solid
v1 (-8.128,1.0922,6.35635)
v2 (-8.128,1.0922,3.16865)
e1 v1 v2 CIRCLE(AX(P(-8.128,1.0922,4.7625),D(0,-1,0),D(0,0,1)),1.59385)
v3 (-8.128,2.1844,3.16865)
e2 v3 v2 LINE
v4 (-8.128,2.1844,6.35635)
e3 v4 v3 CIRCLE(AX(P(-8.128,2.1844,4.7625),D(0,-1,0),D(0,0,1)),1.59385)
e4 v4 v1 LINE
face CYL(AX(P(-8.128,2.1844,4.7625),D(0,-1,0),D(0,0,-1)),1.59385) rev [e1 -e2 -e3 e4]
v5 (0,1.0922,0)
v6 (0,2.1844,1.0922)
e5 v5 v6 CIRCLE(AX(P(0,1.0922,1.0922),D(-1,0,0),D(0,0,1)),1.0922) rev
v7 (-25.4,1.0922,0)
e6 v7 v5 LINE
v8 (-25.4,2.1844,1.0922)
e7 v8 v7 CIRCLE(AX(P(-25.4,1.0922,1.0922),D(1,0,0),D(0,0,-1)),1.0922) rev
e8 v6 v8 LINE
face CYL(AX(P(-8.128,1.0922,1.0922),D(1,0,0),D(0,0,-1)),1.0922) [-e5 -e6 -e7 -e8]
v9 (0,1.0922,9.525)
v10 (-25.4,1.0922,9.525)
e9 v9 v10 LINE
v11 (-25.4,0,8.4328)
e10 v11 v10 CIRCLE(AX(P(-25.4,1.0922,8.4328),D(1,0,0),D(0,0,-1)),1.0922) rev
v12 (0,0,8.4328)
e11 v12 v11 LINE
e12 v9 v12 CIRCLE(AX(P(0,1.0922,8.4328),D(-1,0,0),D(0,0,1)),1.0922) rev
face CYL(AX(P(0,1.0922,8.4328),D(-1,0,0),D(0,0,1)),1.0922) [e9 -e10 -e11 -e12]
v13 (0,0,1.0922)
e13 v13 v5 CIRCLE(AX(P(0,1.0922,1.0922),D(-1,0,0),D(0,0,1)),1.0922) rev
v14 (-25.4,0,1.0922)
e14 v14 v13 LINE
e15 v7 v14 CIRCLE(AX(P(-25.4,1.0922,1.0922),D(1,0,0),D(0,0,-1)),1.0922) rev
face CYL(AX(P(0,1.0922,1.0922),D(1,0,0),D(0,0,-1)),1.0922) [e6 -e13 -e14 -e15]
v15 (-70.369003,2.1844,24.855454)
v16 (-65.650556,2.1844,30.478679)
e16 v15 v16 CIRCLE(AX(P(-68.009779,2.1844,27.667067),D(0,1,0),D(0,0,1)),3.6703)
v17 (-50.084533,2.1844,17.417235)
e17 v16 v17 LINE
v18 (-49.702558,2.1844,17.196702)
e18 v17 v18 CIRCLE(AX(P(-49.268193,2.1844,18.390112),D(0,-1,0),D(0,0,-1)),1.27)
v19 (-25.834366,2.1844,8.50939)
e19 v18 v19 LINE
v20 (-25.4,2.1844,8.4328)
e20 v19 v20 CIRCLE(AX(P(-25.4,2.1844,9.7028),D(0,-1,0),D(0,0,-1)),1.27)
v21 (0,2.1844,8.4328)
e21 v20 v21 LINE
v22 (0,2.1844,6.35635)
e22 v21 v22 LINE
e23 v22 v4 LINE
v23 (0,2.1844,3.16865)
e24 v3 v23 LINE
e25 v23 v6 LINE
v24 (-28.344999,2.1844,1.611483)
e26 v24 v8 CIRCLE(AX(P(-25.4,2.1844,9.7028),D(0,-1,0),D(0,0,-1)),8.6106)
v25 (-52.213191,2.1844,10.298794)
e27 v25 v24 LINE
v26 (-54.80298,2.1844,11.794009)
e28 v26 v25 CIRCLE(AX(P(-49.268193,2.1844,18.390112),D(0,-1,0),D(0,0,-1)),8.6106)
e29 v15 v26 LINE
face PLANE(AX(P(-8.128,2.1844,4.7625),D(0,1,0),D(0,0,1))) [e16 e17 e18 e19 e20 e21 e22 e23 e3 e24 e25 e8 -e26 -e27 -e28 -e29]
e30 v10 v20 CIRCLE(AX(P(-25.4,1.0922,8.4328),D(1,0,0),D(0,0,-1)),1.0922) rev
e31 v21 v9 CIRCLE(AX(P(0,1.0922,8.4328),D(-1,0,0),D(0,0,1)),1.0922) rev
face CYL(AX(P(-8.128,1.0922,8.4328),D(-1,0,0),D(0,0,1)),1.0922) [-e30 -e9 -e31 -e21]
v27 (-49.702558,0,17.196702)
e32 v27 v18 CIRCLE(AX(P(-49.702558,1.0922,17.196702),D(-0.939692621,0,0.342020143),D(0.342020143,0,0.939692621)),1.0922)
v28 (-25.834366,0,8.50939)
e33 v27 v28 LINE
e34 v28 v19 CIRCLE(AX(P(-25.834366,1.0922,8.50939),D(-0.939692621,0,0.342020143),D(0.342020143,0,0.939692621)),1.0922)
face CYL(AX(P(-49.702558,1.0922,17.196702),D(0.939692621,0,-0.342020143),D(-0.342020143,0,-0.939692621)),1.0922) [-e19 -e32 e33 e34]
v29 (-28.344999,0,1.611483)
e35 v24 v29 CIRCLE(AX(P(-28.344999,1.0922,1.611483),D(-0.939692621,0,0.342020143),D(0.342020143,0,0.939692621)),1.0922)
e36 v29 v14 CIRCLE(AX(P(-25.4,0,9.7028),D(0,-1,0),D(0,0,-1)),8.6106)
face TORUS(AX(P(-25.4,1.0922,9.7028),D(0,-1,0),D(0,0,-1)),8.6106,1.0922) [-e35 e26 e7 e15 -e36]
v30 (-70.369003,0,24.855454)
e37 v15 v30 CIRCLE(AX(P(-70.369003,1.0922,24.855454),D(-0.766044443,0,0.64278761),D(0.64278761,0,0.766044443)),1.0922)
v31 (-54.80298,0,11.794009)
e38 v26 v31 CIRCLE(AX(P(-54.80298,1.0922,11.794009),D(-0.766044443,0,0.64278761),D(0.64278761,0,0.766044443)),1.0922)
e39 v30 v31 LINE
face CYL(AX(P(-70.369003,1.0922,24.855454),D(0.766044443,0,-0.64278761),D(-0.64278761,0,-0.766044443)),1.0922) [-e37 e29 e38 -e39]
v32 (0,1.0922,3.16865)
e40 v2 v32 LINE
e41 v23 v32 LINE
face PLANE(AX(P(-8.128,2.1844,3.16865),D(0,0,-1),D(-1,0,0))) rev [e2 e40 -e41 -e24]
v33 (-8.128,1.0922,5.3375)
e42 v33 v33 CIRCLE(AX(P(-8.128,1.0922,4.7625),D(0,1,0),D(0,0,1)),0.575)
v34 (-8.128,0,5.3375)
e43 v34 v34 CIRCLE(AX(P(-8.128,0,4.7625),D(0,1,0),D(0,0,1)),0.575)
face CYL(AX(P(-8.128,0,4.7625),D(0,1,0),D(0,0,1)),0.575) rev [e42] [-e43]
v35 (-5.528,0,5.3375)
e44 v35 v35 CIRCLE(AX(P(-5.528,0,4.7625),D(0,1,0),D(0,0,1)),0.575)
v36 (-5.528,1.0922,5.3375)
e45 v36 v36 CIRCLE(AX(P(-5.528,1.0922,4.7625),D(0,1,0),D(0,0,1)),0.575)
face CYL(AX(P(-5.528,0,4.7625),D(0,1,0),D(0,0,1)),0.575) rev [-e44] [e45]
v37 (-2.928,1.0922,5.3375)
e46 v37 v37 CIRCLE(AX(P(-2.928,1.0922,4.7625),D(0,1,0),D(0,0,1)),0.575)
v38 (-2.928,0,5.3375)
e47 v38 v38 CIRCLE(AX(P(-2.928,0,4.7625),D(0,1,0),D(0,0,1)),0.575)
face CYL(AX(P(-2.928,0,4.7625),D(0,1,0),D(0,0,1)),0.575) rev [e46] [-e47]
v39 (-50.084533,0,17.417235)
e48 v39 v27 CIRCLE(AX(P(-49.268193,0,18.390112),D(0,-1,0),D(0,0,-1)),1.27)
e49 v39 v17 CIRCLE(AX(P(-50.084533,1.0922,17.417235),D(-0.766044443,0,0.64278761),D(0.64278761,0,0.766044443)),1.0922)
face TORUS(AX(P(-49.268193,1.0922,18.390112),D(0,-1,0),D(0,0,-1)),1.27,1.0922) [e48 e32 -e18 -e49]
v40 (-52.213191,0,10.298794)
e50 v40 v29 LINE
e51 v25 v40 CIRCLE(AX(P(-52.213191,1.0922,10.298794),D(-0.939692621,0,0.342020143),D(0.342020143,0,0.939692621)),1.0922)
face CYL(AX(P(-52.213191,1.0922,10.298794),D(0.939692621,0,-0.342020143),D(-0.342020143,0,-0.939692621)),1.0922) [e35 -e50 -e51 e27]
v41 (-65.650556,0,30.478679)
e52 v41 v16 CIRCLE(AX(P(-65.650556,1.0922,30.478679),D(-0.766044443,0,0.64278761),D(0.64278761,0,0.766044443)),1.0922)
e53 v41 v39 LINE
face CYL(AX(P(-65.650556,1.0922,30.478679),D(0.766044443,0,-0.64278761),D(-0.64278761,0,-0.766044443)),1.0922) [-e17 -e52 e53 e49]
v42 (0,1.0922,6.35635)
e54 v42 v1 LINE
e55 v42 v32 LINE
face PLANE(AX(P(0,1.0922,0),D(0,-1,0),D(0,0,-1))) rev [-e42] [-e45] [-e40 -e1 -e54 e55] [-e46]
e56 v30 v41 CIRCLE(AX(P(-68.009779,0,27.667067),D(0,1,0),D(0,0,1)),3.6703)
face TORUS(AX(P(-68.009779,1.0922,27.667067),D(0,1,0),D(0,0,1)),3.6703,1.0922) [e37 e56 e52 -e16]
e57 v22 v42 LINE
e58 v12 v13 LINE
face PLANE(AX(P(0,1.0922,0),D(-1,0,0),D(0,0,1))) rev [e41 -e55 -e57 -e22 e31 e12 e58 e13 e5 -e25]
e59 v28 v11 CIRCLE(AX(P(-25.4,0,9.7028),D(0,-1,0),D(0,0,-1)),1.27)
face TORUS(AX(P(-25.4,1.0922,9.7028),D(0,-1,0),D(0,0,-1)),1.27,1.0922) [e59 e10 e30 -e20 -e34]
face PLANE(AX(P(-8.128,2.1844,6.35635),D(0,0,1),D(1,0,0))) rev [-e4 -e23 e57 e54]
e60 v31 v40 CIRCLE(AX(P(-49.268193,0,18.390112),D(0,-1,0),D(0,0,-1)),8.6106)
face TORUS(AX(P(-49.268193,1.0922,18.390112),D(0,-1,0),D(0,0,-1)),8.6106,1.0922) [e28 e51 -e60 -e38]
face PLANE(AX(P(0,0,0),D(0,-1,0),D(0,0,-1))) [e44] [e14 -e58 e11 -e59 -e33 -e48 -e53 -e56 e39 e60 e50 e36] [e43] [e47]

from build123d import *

# Parameters (mm, degrees)
SKETCH1_W           = 25.4
SKETCH1_H           = 9.525
BOSS_EXTRUDE1_DEPTH = 1.0922
BOSS_EXTRUDE2_DEPTH = 1.0922
FILLET1_R           = 1.0922
SKETCH3_R           = 0.575
CUT_EXTRUDE1_DEPTH  = 28.149190151
REVOLVE1_ANGLE      = 20
BOSS_EXTRUDE3_DEPTH = 25.4
REVOLVE2_ANGLE      = 20
BOSS_EXTRUDE4_DEPTH = 20.32
REVOLVE3_ANGLE      = 180


with BuildPart() as part:
    # Sketch1 → Boss-Extrude1 (new body)
    with BuildSketch(Plane(origin=(0, 0, 0), x_dir=(1, 0, 0), z_dir=(0, 1, 0))):
        with Locations((-12.7, -4.7625)):
            Rectangle(SKETCH1_W, SKETCH1_H)
    extrude(amount=BOSS_EXTRUDE1_DEPTH)

    # Sketch2 → Boss-Extrude2 (add)
    with BuildSketch(Plane(origin=(0, 1.0922, 0), x_dir=(1, 0, 0), z_dir=(0, 1, 0))):
        with BuildLine():
            Line((-8.128, -3.16865), (0, -3.16865))
            Line((0, -3.16865), (0, 0))
            Line((0, 0), (-25.4, 0))
            Line((-25.4, 0), (-25.4, -9.525))
            Line((-25.4, -9.525), (0, -9.525))
            Line((0, -9.525), (0, -6.35635))
            Line((0, -6.35635), (-8.128, -6.35635))
            ThreePointArc((-8.128, -6.35635), (-9.72185, -4.7625), (-8.128, -3.16865))
        make_face()
    extrude(amount=BOSS_EXTRUDE2_DEPTH)

    # Fillet1
    fillet1_edges = [part.edges().sort_by_distance(p)[0] for p in [
        (-12.7, 0, 0),
        (-12.7, 2.1844, 0),
        (-12.7, 0, 9.525),
        (-12.7, 2.1844, 9.525),
    ]]
    fillet(fillet1_edges, radius=FILLET1_R - 0.0001)  # a hair under: the kernel refuses the full size

    # Sketch3 → Cut-Extrude1 (cut, through all)
    with BuildSketch(Plane(origin=(0, 1.0922, 0), x_dir=(1, 0, 0), z_dir=(0, 1, 0))):
        with Locations(Location((-8.128, -4.7625, 0), (0, 0, 270))):
            Circle(SKETCH3_R)
        with Locations(Location((-5.528, -4.7625, 0), (0, 0, 270))):
            Circle(SKETCH3_R)
        with Locations(Location((-2.928, -4.7625, 0), (0, 0, 270))):
            Circle(SKETCH3_R)
    extrude(amount=-CUT_EXTRUDE1_DEPTH, mode=Mode.SUBTRACT)

    # Sketch5 → Revolve1 (revolve)
    with BuildSketch(Plane.ZY.offset(25.4)):
        with BuildLine():
            Line((1.0922, 0), (8.4328, 0))
            ThreePointArc((8.4328, 0), (9.205102026, 0.319897974), (9.525, 1.0922))
            ThreePointArc((9.525, 1.0922), (9.205102026, 1.864502026), (8.4328, 2.1844))
            Line((8.4328, 2.1844), (1.0922, 2.1844))
            ThreePointArc((1.0922, 2.1844), (0.319897974, 1.864502026), (0, 1.0922))
            ThreePointArc((0, 1.0922), (0.319897974, 0.319897974), (1.0922, 0))
        make_face()
    revolve(axis=Axis((-25.4, 2.1844, 9.7028), (0, 1, 0)), revolution_arc=REVOLVE1_ANGLE)

    # Sketch7 → Boss-Extrude3 (add)
    with BuildSketch(Plane(origin=(-25.547184237, 0, 9.298414632), x_dir=(0.34202014332566943, 0, 0.9396926207859082), z_dir=(-0.9396926207859082, 0, 0.34202014332566943))):
        with BuildLine():
            Line((-8.18026208, 0), (-0.83966208, 0))
            ThreePointArc((-0.83966208, 0), (0.25253792, 1.0922), (-0.83966208, 2.1844))
            Line((-0.83966208, 2.1844), (-8.18026208, 2.1844))
            ThreePointArc((-8.18026208, 2.1844), (-9.27246208, 1.0922), (-8.18026208, 0))
        make_face()
    extrude(amount=BOSS_EXTRUDE3_DEPTH)

    # Sketch9 → Revolve2 (revolve)
    with BuildSketch(Plane(origin=(-49.415376805, 0, 17.985726272), x_dir=(0.34202014332566943, 0, 0.9396926207859082), z_dir=(-0.9396926207859082, 0, 0.34202014332566943))):
        with BuildLine():
            Line((-8.18026208, 0), (-0.83966208, 0))
            ThreePointArc((-0.83966208, 0), (0.25253792, 1.0922), (-0.83966208, 2.1844))
            Line((-0.83966208, 2.1844), (-8.18026208, 2.1844))
            ThreePointArc((-8.18026208, 2.1844), (-9.27246208, 1.0922), (-8.18026208, 0))
        make_face()
    revolve(axis=Axis((-49.268192568, 2.1844, 18.39011164), (0, 1, 0)), revolution_arc=REVOLVE2_ANGLE)

    # Sketch10 → Boss-Extrude4 (add)
    with BuildSketch(Plane(origin=(-37.967124473, 0, 31.858200142), x_dir=(0.6427876096865406, 0, 0.7660444431189771), z_dir=(-0.766044443118977, 0, 0.6427876096865405))):
        with BuildLine():
            Line((-26.191940904, 0), (-18.851340904, 0))
            ThreePointArc((-18.851340904, 0), (-17.759140904, 1.0922), (-18.851340904, 2.1844))
            Line((-18.851340904, 2.1844), (-26.191940904, 2.1844))
            ThreePointArc((-26.191940904, 2.1844), (-27.284140904, 1.0922), (-26.191940904, 0))
        make_face()
    extrude(amount=BOSS_EXTRUDE4_DEPTH)

    # Sketch11 → Revolve3 (revolve)
    with BuildSketch(Plane(origin=(-53.533147557, 0, 44.919644371), x_dir=(0.6427876096865407, 0, 0.7660444431189769), z_dir=(-0.7660444431189769, 0, 0.6427876096865407))):
        with BuildLine():
            Line((-18.851340904, 2.1844), (-22.521640904, 2.1844))
            Line((-22.521640904, 2.1844), (-22.521640904, 0))
            Line((-22.521640904, 0), (-18.851340904, 0))
            ThreePointArc((-18.851340904, 0), (-17.759140904, 1.0922), (-18.851340904, 2.1844))
        make_face()
    revolve(axis=Axis((-68.00977928, 2.1844, 27.667066507), (0, -1, 0)), revolution_arc=REVOLVE3_ANGLE)


solid = part.part
